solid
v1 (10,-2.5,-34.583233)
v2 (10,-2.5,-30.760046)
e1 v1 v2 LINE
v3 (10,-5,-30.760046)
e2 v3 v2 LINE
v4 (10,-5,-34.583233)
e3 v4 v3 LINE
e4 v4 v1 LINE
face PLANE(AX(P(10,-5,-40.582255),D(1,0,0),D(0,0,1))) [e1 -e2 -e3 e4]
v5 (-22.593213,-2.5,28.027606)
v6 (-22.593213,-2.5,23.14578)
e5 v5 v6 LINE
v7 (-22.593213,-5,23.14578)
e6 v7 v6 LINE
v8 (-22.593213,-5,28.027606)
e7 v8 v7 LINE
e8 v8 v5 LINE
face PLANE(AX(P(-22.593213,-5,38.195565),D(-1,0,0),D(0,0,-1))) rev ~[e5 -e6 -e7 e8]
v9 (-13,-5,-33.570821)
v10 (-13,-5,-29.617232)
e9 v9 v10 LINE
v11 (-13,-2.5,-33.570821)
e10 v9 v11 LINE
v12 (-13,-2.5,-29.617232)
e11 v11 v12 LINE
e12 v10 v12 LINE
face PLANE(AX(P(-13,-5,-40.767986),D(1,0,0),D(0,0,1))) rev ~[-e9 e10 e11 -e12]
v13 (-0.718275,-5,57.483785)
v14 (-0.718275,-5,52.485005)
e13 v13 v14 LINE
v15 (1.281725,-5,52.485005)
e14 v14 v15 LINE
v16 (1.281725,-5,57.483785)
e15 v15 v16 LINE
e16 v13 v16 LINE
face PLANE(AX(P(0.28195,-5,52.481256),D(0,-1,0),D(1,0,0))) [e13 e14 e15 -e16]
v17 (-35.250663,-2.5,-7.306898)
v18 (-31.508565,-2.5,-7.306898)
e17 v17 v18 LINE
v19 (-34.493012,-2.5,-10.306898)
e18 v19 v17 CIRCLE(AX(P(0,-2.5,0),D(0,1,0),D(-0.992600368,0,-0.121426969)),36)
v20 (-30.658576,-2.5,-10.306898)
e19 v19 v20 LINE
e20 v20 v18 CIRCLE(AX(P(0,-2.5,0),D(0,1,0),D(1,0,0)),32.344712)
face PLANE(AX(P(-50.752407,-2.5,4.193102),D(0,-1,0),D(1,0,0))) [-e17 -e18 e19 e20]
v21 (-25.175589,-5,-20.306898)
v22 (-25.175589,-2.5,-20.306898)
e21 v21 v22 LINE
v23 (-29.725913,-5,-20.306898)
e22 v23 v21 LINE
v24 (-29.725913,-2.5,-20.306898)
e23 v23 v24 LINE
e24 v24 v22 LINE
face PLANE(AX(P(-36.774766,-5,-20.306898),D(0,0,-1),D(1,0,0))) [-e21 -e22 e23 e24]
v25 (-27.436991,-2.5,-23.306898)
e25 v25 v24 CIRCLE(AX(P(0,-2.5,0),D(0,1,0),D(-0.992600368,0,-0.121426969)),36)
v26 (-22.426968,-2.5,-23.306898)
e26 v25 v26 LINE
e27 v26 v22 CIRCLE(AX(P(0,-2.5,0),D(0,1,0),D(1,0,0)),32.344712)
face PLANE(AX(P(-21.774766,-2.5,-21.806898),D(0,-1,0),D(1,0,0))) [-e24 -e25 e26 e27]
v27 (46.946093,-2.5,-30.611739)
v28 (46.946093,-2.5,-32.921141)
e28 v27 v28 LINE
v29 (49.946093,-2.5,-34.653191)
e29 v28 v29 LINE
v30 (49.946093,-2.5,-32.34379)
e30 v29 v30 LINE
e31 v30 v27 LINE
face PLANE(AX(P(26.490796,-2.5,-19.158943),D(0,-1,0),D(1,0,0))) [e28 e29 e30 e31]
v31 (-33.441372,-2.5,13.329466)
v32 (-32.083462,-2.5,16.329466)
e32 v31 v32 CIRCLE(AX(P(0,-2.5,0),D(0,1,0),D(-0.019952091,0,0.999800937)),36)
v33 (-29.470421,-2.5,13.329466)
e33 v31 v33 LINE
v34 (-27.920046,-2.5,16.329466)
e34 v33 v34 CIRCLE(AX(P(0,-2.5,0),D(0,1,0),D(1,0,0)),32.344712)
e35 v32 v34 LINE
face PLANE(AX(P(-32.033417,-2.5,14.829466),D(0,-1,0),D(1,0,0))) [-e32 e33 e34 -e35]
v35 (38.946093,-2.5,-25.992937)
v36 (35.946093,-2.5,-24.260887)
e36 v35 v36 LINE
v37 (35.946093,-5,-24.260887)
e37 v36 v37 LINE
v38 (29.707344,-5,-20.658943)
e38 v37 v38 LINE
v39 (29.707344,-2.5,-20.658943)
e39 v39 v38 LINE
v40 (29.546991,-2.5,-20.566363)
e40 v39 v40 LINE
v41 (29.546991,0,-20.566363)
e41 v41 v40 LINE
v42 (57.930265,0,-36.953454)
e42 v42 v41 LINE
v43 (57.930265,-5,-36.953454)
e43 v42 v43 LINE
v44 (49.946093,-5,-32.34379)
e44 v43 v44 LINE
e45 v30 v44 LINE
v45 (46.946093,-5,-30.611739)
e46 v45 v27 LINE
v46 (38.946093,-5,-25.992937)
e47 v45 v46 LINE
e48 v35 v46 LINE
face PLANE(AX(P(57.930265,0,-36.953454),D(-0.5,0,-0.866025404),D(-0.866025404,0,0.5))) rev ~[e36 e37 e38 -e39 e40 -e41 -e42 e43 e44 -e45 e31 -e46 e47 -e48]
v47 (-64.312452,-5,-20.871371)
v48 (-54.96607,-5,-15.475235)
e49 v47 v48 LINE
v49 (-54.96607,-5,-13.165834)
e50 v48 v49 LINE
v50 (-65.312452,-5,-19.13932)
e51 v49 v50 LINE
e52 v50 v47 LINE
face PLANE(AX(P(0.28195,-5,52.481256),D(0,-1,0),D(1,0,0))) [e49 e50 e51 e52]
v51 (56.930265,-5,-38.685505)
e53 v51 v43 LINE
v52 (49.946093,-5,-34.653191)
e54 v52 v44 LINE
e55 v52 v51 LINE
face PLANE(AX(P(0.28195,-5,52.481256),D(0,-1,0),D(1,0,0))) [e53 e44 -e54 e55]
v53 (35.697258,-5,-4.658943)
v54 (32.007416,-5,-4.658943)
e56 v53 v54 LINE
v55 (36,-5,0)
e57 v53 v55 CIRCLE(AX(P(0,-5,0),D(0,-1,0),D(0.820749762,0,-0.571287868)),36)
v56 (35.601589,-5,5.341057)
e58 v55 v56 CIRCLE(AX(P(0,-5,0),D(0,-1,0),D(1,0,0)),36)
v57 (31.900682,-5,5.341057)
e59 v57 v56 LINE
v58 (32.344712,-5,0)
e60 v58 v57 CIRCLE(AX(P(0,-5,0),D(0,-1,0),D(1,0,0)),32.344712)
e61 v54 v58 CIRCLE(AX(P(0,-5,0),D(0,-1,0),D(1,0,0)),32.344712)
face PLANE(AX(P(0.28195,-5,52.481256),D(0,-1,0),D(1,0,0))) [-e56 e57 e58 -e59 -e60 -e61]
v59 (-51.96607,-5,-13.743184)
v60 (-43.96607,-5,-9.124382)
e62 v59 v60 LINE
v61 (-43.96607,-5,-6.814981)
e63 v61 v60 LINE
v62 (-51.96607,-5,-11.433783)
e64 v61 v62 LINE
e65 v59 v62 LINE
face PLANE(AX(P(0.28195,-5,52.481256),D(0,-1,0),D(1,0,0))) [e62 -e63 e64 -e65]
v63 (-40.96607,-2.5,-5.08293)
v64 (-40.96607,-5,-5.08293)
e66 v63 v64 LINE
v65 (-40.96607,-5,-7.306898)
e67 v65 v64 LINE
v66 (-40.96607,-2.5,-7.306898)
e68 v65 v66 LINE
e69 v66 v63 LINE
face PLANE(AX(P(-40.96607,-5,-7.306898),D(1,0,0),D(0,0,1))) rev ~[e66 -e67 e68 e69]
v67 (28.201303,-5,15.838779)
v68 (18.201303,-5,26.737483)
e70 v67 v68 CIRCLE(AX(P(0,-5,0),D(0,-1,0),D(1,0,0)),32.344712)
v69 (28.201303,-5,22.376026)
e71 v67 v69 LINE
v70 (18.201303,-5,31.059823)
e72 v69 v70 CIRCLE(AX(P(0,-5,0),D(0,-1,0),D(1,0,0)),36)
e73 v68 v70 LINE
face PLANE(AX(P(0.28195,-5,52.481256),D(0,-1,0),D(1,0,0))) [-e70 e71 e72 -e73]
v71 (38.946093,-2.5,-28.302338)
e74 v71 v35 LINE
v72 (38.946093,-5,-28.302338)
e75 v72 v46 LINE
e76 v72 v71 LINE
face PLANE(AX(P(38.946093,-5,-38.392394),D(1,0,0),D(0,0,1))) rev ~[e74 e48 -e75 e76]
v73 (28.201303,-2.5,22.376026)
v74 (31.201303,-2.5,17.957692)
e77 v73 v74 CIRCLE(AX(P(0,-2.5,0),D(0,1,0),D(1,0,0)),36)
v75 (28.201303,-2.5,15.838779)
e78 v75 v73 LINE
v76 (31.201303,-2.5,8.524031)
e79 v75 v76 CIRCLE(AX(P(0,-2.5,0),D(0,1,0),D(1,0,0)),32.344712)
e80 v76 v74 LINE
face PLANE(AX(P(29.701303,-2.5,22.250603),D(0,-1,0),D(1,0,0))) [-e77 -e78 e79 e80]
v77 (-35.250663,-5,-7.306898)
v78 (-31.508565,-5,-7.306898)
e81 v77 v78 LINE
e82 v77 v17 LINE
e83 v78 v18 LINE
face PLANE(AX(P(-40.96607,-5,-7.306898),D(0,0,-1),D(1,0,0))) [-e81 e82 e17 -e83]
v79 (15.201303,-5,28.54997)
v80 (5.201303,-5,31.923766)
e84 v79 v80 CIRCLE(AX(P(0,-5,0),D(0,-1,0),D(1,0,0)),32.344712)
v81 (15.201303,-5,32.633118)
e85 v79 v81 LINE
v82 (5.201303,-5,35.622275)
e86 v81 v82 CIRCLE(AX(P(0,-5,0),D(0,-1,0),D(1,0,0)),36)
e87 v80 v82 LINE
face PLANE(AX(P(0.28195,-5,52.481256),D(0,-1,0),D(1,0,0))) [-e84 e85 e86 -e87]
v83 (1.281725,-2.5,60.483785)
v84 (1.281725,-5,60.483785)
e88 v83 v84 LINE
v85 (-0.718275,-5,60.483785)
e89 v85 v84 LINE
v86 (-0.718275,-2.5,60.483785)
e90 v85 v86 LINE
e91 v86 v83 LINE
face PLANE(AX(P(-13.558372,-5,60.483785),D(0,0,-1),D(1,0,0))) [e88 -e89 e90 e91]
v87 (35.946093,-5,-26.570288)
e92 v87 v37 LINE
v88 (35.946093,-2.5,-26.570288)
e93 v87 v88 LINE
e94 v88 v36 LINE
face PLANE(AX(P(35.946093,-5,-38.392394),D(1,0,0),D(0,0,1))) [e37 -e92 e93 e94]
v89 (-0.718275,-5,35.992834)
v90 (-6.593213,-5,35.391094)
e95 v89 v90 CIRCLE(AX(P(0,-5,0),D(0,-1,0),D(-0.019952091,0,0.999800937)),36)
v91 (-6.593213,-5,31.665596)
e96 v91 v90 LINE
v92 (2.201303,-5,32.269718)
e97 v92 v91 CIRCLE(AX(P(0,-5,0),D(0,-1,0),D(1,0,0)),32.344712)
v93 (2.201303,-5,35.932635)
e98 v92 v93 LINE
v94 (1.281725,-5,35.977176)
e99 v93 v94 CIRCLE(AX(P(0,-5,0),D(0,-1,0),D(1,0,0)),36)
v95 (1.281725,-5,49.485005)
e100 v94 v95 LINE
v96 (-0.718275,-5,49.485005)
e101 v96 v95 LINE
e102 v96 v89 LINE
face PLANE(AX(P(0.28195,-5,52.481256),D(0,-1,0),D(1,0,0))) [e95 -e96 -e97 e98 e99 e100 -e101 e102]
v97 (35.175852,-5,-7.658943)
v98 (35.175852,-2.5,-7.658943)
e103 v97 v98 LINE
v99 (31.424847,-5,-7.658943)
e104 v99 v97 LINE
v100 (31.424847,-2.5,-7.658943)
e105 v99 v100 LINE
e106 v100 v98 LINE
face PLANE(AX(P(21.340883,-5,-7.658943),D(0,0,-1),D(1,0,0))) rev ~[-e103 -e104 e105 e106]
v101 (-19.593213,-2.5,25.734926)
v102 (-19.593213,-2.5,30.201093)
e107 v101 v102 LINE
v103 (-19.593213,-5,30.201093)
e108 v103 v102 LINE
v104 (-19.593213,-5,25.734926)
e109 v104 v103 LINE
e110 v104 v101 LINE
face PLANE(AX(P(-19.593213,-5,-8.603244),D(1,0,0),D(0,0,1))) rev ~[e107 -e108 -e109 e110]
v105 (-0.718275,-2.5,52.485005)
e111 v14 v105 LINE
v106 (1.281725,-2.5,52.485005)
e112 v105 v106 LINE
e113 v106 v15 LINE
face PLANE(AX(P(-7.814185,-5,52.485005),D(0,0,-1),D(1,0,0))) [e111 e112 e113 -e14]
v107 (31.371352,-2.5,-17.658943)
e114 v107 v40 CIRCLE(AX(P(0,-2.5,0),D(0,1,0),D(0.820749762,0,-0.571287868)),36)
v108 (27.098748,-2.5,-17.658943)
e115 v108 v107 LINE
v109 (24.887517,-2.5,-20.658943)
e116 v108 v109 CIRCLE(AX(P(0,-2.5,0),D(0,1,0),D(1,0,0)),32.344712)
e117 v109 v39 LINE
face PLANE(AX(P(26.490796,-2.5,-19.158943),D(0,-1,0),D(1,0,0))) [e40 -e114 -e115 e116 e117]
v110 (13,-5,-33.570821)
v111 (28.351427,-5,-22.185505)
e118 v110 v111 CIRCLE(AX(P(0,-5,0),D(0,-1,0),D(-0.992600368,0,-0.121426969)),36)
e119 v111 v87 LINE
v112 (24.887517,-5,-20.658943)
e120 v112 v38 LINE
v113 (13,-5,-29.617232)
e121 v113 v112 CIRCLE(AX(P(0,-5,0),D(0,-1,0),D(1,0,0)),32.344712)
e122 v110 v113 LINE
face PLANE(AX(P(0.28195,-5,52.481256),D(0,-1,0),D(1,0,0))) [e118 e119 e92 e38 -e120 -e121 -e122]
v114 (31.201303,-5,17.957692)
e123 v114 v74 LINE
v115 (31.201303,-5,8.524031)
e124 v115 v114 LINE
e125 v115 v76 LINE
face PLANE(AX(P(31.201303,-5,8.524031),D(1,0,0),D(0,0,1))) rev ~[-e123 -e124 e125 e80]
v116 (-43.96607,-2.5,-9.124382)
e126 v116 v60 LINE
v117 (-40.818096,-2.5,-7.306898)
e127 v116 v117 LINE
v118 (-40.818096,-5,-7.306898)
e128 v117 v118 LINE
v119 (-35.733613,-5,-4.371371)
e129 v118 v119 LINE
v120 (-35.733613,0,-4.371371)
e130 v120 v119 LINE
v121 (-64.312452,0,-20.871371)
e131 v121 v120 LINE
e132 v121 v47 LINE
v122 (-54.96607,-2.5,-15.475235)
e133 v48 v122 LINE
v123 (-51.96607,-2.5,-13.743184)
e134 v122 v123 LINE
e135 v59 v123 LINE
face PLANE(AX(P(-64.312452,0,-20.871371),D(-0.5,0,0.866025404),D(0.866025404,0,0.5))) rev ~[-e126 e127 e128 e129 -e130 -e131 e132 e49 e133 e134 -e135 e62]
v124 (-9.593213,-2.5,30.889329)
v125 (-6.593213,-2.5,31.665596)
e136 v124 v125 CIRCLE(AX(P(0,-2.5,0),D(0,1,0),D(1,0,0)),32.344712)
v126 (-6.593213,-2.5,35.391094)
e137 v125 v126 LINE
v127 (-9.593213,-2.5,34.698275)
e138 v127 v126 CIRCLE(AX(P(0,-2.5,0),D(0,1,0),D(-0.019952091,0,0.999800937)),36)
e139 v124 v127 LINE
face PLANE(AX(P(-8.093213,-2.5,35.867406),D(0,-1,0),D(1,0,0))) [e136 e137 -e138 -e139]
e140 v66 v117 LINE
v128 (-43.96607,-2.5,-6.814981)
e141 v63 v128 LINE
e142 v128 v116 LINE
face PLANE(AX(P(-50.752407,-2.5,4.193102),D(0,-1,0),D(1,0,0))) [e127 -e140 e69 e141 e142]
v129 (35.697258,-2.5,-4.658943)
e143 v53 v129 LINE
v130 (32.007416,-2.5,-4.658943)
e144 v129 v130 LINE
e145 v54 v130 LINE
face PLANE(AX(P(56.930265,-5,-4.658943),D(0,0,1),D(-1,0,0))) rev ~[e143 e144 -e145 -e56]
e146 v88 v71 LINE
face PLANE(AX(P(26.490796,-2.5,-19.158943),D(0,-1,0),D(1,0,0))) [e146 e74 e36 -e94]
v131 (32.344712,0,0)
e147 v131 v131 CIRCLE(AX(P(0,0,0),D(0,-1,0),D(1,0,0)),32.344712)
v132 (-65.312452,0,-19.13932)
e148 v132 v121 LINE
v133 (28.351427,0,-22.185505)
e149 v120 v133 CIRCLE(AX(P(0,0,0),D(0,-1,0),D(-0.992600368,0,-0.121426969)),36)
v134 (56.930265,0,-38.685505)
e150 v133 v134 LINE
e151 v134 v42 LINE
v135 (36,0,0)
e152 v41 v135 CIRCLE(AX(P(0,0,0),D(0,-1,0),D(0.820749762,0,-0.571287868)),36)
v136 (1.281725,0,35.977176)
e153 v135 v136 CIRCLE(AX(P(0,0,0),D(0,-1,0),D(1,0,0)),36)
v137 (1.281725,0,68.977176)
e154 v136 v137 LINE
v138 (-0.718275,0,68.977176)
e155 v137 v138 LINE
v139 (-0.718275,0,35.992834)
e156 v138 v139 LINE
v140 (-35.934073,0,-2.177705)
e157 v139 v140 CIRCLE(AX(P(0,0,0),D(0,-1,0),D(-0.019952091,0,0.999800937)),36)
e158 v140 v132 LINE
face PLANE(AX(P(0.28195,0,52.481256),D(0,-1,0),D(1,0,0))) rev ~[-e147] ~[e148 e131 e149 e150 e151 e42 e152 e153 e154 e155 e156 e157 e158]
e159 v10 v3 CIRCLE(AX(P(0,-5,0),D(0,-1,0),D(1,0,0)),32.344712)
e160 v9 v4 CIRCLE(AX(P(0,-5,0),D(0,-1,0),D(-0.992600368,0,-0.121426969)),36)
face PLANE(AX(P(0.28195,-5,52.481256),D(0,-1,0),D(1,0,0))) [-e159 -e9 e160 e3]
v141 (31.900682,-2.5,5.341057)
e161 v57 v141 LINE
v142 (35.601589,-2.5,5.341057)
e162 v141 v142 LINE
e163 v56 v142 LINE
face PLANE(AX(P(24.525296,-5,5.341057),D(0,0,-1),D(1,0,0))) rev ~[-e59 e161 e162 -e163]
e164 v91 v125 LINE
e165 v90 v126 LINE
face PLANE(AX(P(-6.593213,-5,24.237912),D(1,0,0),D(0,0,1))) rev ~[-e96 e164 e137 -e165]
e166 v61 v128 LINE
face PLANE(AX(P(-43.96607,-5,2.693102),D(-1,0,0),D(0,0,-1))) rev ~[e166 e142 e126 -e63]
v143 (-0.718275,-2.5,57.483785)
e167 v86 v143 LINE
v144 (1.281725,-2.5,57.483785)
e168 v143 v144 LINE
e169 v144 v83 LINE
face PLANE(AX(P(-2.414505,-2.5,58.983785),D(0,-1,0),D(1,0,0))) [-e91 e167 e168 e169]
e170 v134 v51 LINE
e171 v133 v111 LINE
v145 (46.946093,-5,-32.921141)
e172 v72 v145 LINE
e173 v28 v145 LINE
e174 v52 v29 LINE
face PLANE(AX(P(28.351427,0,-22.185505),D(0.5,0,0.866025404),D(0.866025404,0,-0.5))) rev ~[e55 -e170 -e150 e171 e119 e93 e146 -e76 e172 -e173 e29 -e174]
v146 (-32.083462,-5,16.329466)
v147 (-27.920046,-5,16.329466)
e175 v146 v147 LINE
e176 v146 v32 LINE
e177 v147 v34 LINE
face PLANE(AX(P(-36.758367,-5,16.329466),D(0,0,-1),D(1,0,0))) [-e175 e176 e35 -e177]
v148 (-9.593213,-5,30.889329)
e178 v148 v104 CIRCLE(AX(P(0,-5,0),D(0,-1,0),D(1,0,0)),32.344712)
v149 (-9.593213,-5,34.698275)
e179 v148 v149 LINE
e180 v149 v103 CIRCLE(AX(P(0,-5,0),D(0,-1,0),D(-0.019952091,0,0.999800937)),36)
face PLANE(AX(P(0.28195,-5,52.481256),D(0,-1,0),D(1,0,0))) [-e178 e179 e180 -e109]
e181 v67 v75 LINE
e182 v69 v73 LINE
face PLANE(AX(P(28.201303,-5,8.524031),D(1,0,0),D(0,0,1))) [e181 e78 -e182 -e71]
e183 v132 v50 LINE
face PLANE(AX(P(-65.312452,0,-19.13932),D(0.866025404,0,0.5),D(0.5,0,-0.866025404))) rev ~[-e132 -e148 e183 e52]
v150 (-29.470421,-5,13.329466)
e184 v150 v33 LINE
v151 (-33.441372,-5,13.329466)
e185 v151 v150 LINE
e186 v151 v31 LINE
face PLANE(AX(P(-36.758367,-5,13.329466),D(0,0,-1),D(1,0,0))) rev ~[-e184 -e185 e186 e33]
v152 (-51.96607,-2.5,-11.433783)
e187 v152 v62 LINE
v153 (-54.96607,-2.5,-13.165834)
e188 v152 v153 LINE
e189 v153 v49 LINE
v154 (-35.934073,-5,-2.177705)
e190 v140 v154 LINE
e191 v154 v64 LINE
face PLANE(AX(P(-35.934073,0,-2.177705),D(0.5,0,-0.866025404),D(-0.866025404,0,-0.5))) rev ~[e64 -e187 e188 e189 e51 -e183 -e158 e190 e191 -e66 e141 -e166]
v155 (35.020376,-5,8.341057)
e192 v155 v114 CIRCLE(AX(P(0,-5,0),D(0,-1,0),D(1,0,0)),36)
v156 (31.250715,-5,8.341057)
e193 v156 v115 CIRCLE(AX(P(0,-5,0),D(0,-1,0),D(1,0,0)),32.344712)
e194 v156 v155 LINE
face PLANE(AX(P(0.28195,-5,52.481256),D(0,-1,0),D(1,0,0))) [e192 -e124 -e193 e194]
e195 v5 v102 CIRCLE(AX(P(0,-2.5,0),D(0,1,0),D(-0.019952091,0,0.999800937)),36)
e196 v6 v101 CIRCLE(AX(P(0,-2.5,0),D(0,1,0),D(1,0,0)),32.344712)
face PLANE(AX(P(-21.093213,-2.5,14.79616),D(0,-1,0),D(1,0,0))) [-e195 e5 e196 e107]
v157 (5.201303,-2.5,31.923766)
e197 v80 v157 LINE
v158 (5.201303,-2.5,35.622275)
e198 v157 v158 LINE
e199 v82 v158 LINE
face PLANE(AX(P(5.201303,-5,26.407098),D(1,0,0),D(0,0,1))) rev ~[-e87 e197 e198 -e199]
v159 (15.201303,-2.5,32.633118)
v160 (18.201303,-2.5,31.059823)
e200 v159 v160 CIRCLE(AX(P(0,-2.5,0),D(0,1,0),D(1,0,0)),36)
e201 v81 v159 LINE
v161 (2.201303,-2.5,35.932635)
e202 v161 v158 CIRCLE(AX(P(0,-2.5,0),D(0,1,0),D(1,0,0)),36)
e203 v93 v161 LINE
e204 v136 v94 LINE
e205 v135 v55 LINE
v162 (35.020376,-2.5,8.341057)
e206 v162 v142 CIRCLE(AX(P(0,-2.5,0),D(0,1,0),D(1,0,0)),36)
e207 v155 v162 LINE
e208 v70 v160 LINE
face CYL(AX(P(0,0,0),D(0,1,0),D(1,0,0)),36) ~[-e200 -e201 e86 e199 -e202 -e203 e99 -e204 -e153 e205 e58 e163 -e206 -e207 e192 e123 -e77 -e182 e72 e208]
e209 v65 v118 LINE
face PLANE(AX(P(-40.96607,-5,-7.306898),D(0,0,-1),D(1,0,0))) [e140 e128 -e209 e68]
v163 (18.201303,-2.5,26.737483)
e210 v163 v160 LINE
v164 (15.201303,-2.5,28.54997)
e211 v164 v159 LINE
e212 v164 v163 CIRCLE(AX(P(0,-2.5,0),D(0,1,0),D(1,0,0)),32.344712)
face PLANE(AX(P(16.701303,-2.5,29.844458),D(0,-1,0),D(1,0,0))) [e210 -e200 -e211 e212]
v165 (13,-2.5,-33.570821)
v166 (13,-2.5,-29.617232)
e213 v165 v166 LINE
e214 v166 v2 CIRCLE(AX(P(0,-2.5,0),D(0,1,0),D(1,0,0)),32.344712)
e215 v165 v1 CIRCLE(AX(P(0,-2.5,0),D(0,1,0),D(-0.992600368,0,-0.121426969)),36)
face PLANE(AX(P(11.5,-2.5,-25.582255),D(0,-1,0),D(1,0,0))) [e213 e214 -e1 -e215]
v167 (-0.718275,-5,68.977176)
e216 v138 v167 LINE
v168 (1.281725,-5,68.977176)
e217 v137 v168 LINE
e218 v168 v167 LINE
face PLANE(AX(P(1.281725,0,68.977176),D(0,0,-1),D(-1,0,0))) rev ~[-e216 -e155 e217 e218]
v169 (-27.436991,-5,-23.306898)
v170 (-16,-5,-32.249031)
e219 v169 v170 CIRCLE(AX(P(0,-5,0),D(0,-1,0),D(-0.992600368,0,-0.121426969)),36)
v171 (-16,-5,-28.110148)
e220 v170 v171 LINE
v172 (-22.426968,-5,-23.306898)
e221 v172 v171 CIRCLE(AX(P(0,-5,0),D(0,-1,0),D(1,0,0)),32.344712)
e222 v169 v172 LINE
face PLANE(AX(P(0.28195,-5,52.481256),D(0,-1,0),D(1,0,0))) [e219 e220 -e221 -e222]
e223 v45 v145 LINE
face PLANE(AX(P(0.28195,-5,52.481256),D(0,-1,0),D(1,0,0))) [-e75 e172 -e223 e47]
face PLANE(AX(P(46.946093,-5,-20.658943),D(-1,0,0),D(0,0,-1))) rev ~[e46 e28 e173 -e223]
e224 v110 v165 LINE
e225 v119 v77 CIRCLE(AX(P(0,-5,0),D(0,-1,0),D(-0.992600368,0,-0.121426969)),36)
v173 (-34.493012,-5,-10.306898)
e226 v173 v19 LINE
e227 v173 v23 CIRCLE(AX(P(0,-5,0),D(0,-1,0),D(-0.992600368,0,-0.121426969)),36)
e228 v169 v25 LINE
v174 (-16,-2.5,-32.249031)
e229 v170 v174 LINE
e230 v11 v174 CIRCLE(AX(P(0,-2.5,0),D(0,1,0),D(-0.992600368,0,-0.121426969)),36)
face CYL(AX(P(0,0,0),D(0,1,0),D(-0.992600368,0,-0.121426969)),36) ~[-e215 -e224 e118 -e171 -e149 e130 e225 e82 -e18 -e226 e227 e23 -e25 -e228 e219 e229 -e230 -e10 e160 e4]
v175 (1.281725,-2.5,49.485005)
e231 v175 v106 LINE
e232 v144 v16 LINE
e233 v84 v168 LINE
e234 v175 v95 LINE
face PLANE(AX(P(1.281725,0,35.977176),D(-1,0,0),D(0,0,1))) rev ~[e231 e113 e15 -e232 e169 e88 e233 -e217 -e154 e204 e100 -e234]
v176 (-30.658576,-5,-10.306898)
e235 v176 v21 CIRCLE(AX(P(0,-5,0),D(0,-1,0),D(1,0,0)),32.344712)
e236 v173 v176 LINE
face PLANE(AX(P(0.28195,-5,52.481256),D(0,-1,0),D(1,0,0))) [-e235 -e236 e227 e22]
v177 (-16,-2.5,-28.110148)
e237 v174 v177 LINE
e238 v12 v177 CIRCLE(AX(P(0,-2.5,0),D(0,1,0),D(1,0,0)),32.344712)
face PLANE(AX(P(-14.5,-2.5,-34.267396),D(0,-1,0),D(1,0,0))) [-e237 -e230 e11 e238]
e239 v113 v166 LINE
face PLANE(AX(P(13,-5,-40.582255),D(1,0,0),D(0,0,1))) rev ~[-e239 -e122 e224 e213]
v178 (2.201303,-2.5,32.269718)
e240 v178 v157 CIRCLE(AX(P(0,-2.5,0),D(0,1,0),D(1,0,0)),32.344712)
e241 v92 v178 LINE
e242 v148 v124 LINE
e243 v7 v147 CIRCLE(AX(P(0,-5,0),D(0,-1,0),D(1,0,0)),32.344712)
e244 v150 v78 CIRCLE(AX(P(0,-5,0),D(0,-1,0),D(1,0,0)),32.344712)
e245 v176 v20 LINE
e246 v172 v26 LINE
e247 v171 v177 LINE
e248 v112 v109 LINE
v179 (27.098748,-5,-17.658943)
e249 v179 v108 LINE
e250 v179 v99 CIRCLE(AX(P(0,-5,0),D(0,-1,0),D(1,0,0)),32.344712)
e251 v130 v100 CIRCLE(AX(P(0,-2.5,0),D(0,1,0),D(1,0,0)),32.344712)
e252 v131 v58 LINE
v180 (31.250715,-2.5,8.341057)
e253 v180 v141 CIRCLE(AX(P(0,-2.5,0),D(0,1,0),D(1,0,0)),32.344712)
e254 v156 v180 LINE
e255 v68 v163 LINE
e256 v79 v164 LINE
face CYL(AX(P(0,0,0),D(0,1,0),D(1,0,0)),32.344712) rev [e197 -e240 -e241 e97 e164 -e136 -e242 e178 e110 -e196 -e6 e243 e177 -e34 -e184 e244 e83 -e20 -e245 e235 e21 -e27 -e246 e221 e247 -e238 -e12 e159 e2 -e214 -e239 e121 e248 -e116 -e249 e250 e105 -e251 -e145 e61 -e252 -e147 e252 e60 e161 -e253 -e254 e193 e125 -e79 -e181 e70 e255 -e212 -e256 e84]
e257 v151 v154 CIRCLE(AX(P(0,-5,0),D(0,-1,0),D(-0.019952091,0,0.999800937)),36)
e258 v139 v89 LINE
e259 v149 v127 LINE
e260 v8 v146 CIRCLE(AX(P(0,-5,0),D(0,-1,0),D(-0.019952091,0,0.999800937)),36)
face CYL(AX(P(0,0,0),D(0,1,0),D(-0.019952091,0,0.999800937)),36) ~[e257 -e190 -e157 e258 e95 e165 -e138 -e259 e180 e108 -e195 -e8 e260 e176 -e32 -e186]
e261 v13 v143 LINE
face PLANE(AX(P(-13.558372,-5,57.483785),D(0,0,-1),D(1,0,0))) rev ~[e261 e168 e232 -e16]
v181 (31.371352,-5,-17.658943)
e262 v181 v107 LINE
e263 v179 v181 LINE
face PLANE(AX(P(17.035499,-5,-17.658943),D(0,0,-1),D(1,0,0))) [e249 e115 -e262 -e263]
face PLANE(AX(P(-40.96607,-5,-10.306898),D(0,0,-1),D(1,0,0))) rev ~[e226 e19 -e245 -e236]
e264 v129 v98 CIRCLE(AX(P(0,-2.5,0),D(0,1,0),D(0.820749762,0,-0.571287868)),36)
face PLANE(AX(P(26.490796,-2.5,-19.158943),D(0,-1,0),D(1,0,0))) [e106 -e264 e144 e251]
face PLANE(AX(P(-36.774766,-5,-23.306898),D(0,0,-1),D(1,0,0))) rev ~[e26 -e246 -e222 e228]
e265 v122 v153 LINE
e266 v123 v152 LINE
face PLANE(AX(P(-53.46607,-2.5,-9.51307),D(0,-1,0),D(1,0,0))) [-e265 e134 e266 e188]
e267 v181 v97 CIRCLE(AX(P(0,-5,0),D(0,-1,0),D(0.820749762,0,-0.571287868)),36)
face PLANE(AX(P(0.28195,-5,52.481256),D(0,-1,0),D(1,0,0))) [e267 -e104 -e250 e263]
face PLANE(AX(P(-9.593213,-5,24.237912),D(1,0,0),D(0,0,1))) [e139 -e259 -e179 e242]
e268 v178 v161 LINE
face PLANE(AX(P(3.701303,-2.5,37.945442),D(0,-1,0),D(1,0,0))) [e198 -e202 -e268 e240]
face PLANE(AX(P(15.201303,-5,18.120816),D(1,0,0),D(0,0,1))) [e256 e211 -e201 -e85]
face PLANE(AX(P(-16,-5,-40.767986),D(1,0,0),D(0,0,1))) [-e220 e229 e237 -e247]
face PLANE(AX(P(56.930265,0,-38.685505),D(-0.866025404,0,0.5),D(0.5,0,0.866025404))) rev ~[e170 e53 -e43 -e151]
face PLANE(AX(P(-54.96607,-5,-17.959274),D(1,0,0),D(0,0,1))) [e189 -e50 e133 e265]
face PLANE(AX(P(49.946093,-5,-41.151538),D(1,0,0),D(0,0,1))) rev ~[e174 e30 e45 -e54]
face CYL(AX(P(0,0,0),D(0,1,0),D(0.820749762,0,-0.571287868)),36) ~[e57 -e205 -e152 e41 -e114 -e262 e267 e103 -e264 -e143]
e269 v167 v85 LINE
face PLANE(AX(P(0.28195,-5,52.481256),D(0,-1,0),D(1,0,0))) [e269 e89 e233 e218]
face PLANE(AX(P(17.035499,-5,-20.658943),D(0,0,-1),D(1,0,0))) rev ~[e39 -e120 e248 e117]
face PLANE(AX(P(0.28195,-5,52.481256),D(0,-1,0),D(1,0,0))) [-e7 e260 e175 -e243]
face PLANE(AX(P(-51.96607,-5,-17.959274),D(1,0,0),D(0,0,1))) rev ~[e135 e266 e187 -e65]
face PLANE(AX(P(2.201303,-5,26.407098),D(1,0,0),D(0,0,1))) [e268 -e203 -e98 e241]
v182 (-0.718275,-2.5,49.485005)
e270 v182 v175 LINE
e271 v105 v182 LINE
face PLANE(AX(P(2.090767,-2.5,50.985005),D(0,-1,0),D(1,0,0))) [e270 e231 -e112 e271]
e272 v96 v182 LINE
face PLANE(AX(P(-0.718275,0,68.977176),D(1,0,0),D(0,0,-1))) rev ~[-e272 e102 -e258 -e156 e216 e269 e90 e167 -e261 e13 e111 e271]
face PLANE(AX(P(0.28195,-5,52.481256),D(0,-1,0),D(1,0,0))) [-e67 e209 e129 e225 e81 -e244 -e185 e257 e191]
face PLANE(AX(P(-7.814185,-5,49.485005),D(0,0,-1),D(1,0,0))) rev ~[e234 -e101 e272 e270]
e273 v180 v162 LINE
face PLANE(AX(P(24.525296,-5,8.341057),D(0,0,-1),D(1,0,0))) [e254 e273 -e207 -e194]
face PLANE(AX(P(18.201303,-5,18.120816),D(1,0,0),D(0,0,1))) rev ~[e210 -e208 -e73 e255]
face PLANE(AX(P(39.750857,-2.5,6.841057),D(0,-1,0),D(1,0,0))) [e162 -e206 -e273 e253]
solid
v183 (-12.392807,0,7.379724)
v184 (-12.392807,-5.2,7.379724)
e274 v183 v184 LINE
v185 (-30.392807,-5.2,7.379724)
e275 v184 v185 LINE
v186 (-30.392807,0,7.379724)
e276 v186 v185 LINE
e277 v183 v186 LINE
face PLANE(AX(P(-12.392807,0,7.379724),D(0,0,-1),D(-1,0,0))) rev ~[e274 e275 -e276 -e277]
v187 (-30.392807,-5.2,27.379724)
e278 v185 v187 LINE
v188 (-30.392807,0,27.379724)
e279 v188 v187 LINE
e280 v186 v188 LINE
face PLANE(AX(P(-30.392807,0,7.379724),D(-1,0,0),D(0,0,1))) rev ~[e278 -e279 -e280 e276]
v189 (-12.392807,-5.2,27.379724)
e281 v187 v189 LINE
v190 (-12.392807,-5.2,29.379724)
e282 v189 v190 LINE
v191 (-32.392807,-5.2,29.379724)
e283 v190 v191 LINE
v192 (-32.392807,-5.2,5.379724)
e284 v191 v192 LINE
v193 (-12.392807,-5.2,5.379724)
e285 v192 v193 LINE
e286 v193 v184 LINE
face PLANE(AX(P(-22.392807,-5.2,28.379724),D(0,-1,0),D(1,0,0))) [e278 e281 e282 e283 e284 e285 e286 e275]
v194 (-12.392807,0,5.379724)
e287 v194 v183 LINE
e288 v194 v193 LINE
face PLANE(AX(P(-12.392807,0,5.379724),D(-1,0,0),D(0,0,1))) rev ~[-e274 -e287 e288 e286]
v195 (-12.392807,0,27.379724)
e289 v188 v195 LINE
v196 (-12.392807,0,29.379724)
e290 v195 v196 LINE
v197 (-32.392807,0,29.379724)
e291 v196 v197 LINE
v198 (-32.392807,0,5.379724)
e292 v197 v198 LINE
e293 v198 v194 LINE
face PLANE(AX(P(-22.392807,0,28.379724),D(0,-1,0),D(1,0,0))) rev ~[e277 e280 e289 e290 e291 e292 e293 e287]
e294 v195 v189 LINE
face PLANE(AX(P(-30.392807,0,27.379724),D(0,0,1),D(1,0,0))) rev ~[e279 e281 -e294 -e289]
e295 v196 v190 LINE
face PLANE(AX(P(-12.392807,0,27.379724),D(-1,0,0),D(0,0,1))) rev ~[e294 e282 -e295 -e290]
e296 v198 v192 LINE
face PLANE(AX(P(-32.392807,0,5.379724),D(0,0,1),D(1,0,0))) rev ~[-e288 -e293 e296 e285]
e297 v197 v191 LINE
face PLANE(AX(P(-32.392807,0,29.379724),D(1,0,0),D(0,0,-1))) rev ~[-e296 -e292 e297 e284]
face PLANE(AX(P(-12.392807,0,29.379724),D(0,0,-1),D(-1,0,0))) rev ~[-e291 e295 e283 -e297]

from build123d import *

# Parameters (mm, degrees)
F0_W     = 2
F0_H     = 20
F1_DEPTH = 5.2
F3_R     = 32.3447121386
F4_DEPTH = 5
F5_W     = 13.572675172
F5_H     = 3
F5_W_2   = 3
F5_H_2   = 7.1146996021
F5_W_3   = 2.1339680368
F5_W_4   = 0.2662442029
F5_W_5   = 13.7997193004
F5_W_6   = 30
F5_H_3   = 13.0011811852
F5_H_4   = 30
F5_W_7   = 18.9105942249
F5_H_5   = 10
F5_W_8   = 8
F5_H_6   = 2.1246682657
F5_H_7   = 17.7334510805
F5_W_9   = 0.0894057751
F5_W_10  = 6.9841714074
F5_W_11  = 30.4511226714
F5_H_8   = 23.2589878142
F5_H_9   = 23.0766864568
F5_H_10  = 16.892408269
F5_W_12  = 17.7097696288
F5_W_13  = 22.2877347842
F5_H_11  = 23.447284475
F5_H_12  = 27.4531447118
F5_W_14  = 19.8099045083
F5_W_15  = 9.4498991966
F5_W_16  = 47.1669645049
F6_DEPTH = 2.5


with BuildPart() as f1:
    # F0 (on Front) → F1 (new body)
    with BuildSketch(Plane.XZ):
        Polygon((-32.3928073049, 29.3797243163), (-32.3928073049, 27.3797243163), (-30.3928073049, 27.3797243163), (-12.3928073049, 27.3797243163), (-12.3928073049, 29.3797243163), align=None)
        with Locations((-31.3928073049, 17.3797243163)):
            Rectangle(F0_W, F0_H)
        Polygon((-30.3928073049, 7.3797243163), (-32.3928073049, 7.3797243163), (-32.3928073049, 5.3797243163), (-12.3928073049, 5.3797243163), (-12.3928073049, 7.3797243163), align=None)
    extrude(amount=F1_DEPTH)


with BuildPart() as f4:
    # F3 (on face) → F4 (new body)
    with BuildSketch(Plane.XZ):
        with BuildLine():
            Line((-0.718275291, 68.9771758448), (-0.718275291, 35.9928337396))
            ThreePointArc((-0.718275291, 35.9928337396), (0.2818334687, 35.9988967872), (1.281724709, 35.9771758448))
            Line((1.281724709, 35.9771758448), (1.281724709, 68.9771758448))
            Line((1.281724709, 68.9771758448), (-0.718275291, 68.9771758448))
        make_face()
        with BuildLine():
            ThreePointArc((1.281724709, 35.9771758448), (0.2818334687, 35.9988967872), (-0.718275291, 35.9928337396))
            ThreePointArc((-0.718275291, 35.9928337396), (-26.4593304957, 24.4111415079), (-35.9340729634, -2.1777052736))
            ThreePointArc((-35.9340729634, -2.1777052736), (-35.8506255781, -3.2760716812), (-35.7336132594, -4.3713708863))
            ThreePointArc((-35.7336132594, -4.3713708863), (-9.6415771636, -34.6848668701), (28.3514265226, -22.185504595))
            ThreePointArc((28.3514265226, -22.185504595), (28.9605266738, -21.3842908411), (29.5469914366, -20.5663632431))
            ThreePointArc((29.5469914366, -20.5663632431), (34.3488842011, -10.7774836646), (36, 0))
            ThreePointArc((36, 0), (25.905038984, 24.9985790644), (1.281724709, 35.9771758448))
        make_face()
        Circle(F3_R, mode=Mode.SUBTRACT)
        with BuildLine():
            ThreePointArc((-35.7336132594, -4.3713708863), (-35.8506255781, -3.2760716812), (-35.9340729634, -2.1777052736))
            Line((-35.9340729634, -2.1777052736), (-65.3124515843, -19.1393200788))
            Line((-65.3124515843, -19.1393200788), (-64.3124515843, -20.8713708863))
            Line((-64.3124515843, -20.8713708863), (-35.7336132594, -4.3713708863))
        make_face()
        with BuildLine():
            Line((57.9302648475, -36.9534537874), (29.5469914366, -20.5663632431))
            ThreePointArc((29.5469914366, -20.5663632431), (28.9605266738, -21.3842908411), (28.3514265226, -22.185504595))
            Line((28.3514265226, -22.185504595), (56.9302648475, -38.685504595))
            Line((56.9302648475, -38.685504595), (57.9302648475, -36.9534537874))
        make_face()
    extrude(amount=F4_DEPTH)

    # F5 (on face) → F6 (cut)
    with BuildSketch(Plane.XZ.offset(5)):
        with Locations((-50.7524073439, 4.1931017637)):
            Rectangle(F5_W, F5_H)
        with Locations((-42.4660697579, 9.2504515648)):
            Rectangle(F5_W_2, F5_H_2)
        with Locations((-42.4660697579, 4.1931017637)):
            Rectangle(F5_W_2, F5_H)
        with Locations((-39.8990857395, 4.1931017637)):
            Rectangle(F5_W_3, F5_H)
        Polygon((-40.9660697579, 2.6931017637), (-43.9660697579, 2.6931017637), (-43.9660697579, -10.9778223559), (-40.9660697579, -10.9778223559), (-40.9660697579, -10.3068982363), (-41.2323139608, -10.3068982363), (-41.2323139608, -7.3068982363), (-40.9660697579, -7.3068982363), align=None)
        with Locations((-41.0991918594, -8.8068982363)):
            Rectangle(F5_W_4, F5_H)
        with Locations((-34.0662101077, -8.8068982363)):
            Rectangle(F5_W_5, F5_H)
        with Locations((-21.7747657001, -21.8068982363)):
            Rectangle(F5_W_6, F5_H)
        with Locations((-14.5, -34.2673957348)):
            Rectangle(F5_W_2, F5_H_3)
        with Locations((11.5, -25.582254529)):
            Rectangle(F5_W_2, F5_H_4)
        with Locations((26.4907963276, -19.1589427693)):
            Rectangle(F5_W_7, F5_H)
        with Locations((37.4460934401, -12.6589427693)):
            Rectangle(F5_W_2, F5_H_5)
        with Locations((37.4460934401, -19.1589427693)):
            Rectangle(F5_W_2, F5_H)
        with Locations((42.9460934401, -19.1589427693)):
            Rectangle(F5_W_8, F5_H)
        with Locations((37.4460934401, -6.5966086365)):
            Rectangle(F5_W_2, F5_H_6)
        Polygon((21.3408830383, -7.6589427693), (35.9460934401, -7.6589427693), (35.9460934401, -5.5342745036), (38.9460934401, -5.5342745036), (38.9460934401, -7.6589427693), (46.9460934401, -7.6589427693), (46.9460934401, -4.6589427693), (21.3408830383, -4.6589427693), align=None)
        with Locations((37.4460934401, -29.5256683096)):
            Rectangle(F5_W_2, F5_H_7)
        Polygon((46.9460934401, -7.6589427693), (46.9460934401, -17.6589427693), (47.0354992151, -17.6589427693), (47.0354992151, -20.6589427693), (46.9460934401, -20.6589427693), (46.9460934401, -41.1515384912), (49.9460934401, -41.1515384912), (49.9460934401, -7.6589427693), align=None)
        with Locations((46.9907963276, -19.1589427693)):
            Rectangle(F5_W_9, F5_H)
        with Locations((48.4460934401, -6.1589427693)):
            Rectangle(F5_W_2, F5_H)
        with Locations((53.4381791438, -6.1589427693)):
            Rectangle(F5_W_10, F5_H)
        with Locations((39.7508572787, 6.8410572307)):
            Rectangle(F5_W_11, F5_H)
        with Locations((-8.0932132453, 35.8674060553)):
            Rectangle(F5_W_2, F5_H_8)
        with Locations((3.7013028025, 37.945441626)):
            Rectangle(F5_W_2, F5_H_9)
        with Locations((-53.4660697579, -9.5130702171)):
            Rectangle(F5_W_2, F5_H_10)
        with Locations((-27.079188149, -68.7113851728)):
            Rectangle(F5_W_12, F5_H)
        with Locations((-2.4145045318, 58.9837848544)):
            Rectangle(F5_W_13, F5_H)
        Polygon((-19.5932132453, 38.1955653429), (-22.5932132453, 38.1955653429), (-22.5932132453, 0.1370755699), (-22.5932132453, -8.6032444029), (-19.5932132453, -8.6032444029), align=None)
        with Locations((16.7013028025, 29.8444582149)):
            Rectangle(F5_W_2, F5_H_11)
        with Locations((29.7013028025, 22.2506034889)):
            Rectangle(F5_W_2, F5_H_12)
        with Locations((2.0907674916, 50.9850047922)):
            Rectangle(F5_W_14, F5_H)
        with Locations((-32.0334173739, 14.8294658735)):
            Rectangle(F5_W_15, F5_H)
        with Locations((18.230658723, -57.7113851728)):
            Rectangle(F5_W_16, F5_H)
    extrude(amount=-F6_DEPTH, mode=Mode.SUBTRACT)


solid = Compound([f1.part, f4.part])
